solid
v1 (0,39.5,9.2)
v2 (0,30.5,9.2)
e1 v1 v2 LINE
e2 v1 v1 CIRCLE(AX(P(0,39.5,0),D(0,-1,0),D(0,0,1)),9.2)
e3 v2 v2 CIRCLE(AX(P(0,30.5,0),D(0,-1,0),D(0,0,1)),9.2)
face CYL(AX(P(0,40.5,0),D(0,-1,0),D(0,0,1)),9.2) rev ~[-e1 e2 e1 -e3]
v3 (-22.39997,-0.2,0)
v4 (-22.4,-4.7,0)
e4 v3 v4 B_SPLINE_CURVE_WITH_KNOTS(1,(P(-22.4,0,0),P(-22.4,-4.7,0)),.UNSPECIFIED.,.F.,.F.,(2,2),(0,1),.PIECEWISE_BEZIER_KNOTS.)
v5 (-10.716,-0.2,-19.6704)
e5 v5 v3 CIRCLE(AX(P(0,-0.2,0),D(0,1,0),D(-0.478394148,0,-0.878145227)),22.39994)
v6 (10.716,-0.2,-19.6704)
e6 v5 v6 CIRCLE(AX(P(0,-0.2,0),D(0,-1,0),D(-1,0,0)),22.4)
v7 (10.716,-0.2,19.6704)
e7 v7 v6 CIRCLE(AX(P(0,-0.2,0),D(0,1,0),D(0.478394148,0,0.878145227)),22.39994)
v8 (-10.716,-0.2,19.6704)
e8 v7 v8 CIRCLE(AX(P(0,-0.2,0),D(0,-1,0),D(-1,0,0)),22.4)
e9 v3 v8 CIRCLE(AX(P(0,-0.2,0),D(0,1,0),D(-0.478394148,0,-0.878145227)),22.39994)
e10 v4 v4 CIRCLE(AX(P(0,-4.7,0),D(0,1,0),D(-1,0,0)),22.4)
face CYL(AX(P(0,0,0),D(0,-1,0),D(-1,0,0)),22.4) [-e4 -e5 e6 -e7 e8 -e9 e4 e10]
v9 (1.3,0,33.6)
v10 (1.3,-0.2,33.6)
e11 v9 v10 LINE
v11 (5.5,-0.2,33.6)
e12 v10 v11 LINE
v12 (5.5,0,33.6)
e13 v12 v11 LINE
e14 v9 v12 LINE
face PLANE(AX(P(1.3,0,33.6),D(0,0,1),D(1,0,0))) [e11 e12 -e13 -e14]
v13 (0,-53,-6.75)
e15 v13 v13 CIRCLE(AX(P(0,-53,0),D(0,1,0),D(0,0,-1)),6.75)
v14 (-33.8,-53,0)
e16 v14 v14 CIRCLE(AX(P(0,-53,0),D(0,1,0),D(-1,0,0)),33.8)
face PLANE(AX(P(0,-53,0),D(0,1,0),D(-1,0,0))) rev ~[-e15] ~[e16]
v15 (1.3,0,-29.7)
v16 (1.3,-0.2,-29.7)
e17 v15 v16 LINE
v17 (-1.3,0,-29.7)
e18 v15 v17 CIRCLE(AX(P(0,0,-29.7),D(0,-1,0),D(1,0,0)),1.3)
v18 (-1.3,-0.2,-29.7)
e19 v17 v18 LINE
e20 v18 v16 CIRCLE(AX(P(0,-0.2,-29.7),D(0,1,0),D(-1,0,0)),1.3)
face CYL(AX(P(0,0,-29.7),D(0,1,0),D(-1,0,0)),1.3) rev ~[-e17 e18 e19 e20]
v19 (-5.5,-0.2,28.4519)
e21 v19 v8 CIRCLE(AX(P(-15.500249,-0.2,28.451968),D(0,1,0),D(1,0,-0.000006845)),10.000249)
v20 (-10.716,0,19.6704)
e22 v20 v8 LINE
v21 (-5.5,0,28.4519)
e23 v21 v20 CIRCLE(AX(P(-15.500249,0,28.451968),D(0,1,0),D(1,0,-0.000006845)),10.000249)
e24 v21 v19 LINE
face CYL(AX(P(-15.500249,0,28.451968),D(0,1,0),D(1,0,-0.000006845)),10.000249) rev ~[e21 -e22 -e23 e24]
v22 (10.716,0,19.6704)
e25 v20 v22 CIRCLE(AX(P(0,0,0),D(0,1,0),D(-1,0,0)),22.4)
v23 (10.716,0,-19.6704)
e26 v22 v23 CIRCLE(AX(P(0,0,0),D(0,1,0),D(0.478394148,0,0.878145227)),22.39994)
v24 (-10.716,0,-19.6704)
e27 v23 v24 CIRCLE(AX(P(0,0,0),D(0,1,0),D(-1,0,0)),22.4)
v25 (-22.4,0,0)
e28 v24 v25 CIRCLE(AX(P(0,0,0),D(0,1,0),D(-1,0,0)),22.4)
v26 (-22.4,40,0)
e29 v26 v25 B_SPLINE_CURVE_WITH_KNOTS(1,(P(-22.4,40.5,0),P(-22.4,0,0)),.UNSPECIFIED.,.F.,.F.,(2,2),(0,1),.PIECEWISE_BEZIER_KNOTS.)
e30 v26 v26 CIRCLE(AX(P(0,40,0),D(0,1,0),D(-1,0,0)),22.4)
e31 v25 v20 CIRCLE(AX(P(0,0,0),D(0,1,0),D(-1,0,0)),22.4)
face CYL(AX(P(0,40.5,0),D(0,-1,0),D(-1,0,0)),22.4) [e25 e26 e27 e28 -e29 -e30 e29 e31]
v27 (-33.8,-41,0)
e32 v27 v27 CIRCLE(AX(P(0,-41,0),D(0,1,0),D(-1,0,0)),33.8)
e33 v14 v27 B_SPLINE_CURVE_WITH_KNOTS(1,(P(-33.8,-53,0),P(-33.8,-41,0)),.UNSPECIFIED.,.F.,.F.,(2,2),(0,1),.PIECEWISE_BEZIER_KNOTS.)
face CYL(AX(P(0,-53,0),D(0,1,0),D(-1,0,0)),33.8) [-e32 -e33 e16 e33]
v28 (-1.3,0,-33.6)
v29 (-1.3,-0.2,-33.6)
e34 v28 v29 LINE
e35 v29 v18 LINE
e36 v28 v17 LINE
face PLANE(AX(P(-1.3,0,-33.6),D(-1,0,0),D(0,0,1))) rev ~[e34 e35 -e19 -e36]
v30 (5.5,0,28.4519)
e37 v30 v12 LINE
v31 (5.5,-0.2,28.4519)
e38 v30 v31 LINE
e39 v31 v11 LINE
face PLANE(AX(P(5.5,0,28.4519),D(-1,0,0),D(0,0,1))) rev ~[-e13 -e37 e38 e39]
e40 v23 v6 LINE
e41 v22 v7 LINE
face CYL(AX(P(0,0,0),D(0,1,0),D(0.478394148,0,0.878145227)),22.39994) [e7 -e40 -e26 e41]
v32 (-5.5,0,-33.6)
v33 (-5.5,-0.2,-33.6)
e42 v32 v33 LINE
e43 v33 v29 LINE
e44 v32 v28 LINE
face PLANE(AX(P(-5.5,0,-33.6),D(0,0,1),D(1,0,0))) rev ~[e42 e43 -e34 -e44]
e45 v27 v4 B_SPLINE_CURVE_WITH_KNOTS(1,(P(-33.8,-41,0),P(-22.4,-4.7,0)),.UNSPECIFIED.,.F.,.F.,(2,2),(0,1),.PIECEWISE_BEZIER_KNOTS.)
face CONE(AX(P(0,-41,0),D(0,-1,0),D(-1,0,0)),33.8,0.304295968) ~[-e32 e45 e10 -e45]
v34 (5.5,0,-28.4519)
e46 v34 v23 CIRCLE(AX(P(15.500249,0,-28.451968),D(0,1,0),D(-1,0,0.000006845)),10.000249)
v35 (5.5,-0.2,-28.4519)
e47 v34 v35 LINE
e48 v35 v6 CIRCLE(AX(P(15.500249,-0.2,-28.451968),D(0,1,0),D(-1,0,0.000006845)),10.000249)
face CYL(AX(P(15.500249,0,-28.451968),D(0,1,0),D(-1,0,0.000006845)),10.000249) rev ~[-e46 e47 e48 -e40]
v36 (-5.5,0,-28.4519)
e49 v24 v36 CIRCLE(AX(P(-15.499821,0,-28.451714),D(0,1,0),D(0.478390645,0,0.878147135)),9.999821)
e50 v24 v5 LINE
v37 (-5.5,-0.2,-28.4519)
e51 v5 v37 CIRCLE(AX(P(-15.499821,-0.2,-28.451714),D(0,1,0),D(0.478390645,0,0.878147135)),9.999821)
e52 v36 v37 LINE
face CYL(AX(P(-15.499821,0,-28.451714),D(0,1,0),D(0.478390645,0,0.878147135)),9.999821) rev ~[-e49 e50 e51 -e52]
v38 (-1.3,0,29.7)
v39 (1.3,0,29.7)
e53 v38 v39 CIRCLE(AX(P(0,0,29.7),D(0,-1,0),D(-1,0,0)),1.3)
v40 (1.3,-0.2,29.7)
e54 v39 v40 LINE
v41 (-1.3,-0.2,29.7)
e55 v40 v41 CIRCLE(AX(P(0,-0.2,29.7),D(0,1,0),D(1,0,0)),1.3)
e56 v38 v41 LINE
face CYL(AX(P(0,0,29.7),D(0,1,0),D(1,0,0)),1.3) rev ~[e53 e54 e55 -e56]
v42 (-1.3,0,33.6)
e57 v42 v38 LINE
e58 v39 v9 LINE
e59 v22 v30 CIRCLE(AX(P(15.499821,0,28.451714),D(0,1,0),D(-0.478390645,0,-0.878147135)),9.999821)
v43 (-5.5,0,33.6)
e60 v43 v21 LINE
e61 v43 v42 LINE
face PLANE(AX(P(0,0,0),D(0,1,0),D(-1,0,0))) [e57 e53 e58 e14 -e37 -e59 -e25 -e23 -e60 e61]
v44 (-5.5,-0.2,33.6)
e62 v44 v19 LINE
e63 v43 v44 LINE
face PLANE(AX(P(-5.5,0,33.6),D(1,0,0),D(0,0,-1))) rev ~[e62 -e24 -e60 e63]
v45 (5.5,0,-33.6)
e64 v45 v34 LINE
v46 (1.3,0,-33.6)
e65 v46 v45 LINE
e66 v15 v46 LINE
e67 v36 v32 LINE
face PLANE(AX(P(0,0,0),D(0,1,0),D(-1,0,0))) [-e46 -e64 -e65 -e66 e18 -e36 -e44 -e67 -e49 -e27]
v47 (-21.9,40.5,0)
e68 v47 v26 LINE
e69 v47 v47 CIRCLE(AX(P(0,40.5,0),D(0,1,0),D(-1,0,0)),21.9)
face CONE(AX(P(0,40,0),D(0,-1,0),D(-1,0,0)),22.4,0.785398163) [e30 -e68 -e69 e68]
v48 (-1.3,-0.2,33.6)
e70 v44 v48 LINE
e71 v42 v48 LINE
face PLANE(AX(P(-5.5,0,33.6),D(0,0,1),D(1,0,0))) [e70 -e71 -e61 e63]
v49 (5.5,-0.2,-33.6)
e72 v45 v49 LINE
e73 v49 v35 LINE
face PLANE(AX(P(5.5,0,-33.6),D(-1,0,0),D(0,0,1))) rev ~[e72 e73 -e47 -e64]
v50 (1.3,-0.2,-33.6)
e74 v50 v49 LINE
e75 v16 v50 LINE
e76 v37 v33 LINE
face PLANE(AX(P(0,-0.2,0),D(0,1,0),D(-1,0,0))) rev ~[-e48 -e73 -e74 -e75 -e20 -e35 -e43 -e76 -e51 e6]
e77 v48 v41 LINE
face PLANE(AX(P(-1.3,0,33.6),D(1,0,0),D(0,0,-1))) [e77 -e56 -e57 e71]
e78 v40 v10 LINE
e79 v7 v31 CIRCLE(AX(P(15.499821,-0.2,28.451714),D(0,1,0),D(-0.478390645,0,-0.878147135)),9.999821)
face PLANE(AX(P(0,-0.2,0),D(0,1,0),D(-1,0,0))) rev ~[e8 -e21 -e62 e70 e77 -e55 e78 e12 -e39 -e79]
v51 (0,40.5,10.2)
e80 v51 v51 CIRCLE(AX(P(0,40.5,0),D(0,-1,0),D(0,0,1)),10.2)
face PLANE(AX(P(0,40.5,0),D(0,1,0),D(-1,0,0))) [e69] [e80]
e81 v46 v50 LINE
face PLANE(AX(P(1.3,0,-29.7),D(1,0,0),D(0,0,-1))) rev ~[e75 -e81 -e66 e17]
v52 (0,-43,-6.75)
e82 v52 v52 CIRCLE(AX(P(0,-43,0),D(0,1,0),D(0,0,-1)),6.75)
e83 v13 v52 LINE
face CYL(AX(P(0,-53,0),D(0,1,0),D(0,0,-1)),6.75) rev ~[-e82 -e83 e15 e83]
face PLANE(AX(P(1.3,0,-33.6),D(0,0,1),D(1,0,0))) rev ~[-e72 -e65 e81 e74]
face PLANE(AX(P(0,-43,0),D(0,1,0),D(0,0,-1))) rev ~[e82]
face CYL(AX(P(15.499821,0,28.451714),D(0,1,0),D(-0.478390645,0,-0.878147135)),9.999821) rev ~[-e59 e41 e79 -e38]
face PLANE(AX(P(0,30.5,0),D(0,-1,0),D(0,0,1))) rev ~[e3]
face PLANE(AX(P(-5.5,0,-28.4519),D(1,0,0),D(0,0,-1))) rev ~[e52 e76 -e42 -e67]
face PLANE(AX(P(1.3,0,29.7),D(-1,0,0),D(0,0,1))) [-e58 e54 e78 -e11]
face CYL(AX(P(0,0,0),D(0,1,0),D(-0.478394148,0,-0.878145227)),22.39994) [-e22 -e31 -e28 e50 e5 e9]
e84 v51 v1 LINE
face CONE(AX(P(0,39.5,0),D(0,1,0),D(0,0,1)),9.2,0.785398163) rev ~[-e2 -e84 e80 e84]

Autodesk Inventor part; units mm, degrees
sketch "Sketch1" plane through (0, 0, 0) normal (0, 1, 0) x (-1, 0, 0)
  circle A0 centre (0, 0) radius 22.4
  dimension "d0" = 44.8
ref_plane "Work Plane1" through (0, 40.5, 0) normal (0, 1, 0) x (-1, 0, 0)
sketch "Sketch2" plane through (0, 40.5, 0) normal (0, 1, 0) x (-1, 0, 0)
  circle A0 centre (0, 0) radius 22.4 projected
ref_plane "Work Plane3" through (0, -53, 0) normal (0, 1, 0) x (-1, 0, 0)
ref_plane "Work Plane2" through (0, -41, 0) normal (0, 1, 0) x (-1, 0, 0)
sketch "Sketch3" plane through (0, -41, 0) normal (0, 1, 0) x (-1, 0, 0)
  circle A0 centre (0, 0) radius 33.8
  dimension "d4" = 67.6
sketch "Sketch4" plane through (0, -53, 0) normal (0, 1, 0) x (-1, 0, 0)
  circle A0 centre (0, 0) radius 33.8 projected
loft "Loft1" add profiles "Sketch2", "Sketch1"
loft "Loft3" [suppressed]
sketch "Sketch5" plane through (0, 0, 0) normal (0, 1, 0) x (-1, 0, 0)
  line L0 (-5.5, 33.6) -> (5.5, -33.6) construction
  line L1 (3.6185, 22.1058) -> (-5.5, -33.6) construction
  line L2 (5.5, 33.6) -> (5.5, 28.4519)
  line L3 (5.5, -28.4519) -> (5.5, -33.6)
  line L4 (-5.5, -33.6) -> (-5.5, -28.4519)
  line L5 (-5.5, 28.4519) -> (-5.5, 33.6)
  arc A0 (-10.716, 19.6704) -> (-10.716, -19.6704) centre (0, 0) ccw
  arc A1 (10.716, -19.6704) -> (10.716, 19.6704) centre (0, 0) ccw
  arc A2 (5.5, 28.4519) -> (10.716, 19.6704) centre (15.5, 28.4519) ccw
  arc A3 (-10.716, 19.6704) -> (-5.5, 28.4519) centre (-15.5, 28.4519) ccw
  arc A4 (10.716, -19.6704) -> (5.5, -28.4519) centre (15.5, -28.4519) ccw
  arc A5 (-5.5, -28.4519) -> (-10.716, -19.6704) centre (-15.5, -28.4519) ccw
  circle A6 centre (0, 0) radius 22.4 construction
  line L6 (0, -22.4) -> (0, -33.6) construction
  line L7 (1.3, -33.6) -> (1.3, -29.7)
  line L8 (0, -28.4) -> (0, -28.4)
  line L9 (-1.3, -29.7) -> (-1.3, -33.6)
  arc A7 (1.3, -29.7) -> (0, -28.4) centre (0, -29.7) ccw
  arc A8 (0, -28.4) -> (-1.3, -29.7) centre (0, -29.7) ccw
  line L10 (5.5, -33.6) -> (1.3, -33.6)
  line L11 (-1.3, -33.6) -> (-5.5, -33.6)
  circle A9 centre (0, 0) radius 33.8 construction
  line L12 (33.8, 0) -> (-33.8, 0) construction
  line L13 (0, 22.4) -> (0, 33.6) construction
  line L14 (1.3, 33.6) -> (1.3, 29.7)
  line L15 (-1.3, 29.7) -> (-1.3, 33.6)
  arc A10 (0, 28.4) -> (1.3, 29.7) centre (0, 29.7) ccw
  arc A11 (-1.3, 29.7) -> (0, 28.4) centre (0, 29.7) ccw
  line L16 (5.5, 33.6) -> (1.3, 33.6)
  line L17 (-1.3, 33.6) -> (-5.5, 33.6)
  circle A12 centre (0, 0) radius 33.8 construction
  point P0 (5.5, 21.7143)
  point P1 (5.5, -21.7143)
  point P2 (-5.5, 21.7143)
  point P3 (-5.5, -21.7143)
  point P4 (1.3, -28.4)
  point P5 (-1.3, -28.4)
  point P6 (1.3, 28.4)
  point P7 (-1.3, 28.4)
  point P8 (0, 28.4)
  dimension "d17" = 11
  dimension "d18" = 67.2
  dimension "d19" = 10
  dimension "d20" = 2.6
  dimension "d21" = 5.2
  dimension "d22" = 1.3
extrude "Extrusion1" add sketch "Sketch5" against normal blind 0.2
ref_plane "Work Plane4" through (0, -4.7, 0) normal (0, 1, 0) x (-1, 0, 0)
sketch "Sketch6" plane through (0, -4.7, 0) normal (0, 1, 0) x (-1, 0, 0)
  circle A0 centre (0, 0) radius 22.4 projected
ref_plane "Work Plane5" through (0, -53, 0) normal (0, 1, 0) x (-1, 0, 0)
sketch "Sketch7" plane through (0, -53, 0) normal (0, 1, 0) x (-1, 0, 0)
  circle A0 centre (0, 0) radius 33.8 projected
loft "Loft4" add profiles "Sketch7", "Sketch3"
loft "Loft5" add profiles "Sketch6" section 1 edges at (33.8, -41, 0)
sketch "Sketch8" plane through (0, 0, 0) normal (0, 1, 0) x (-1, 0, 0)
  circle A0 centre (0, 0) radius 22.4 projected
loft "Loft6" add profiles "Sketch8" section 2 edges at (22.4, -4.7, 0)
sketch "Sketch9" plane through (0, 40.5, 0) normal (0, 1, 0) x (1, 0, 0)
  point P0 (0, 0)
  point P1 (0, 0)
hole "Hole1" at (0, 40.5, 0) direction (0, -1, 0) diameter 18.4 depth 10
chamfer "Chamfer1" distance 1 angle 45 1 edges at (0, 40.5, -9.2)
chamfer "Chamfer2" distance 0.5 angle 45 1 edges at (22.4, 40.5, 0)
sketch "Sketch10" plane through (0, -53, 0) normal (0, -1, 0) x (1, 0, 0)
  point P0 (0, 0)
  point P1 (0, 0)
hole "Hole2" at (0, -53, 0) direction (0, 1, 0) diameter 13.5 depth 10
properties part number "shaker"
